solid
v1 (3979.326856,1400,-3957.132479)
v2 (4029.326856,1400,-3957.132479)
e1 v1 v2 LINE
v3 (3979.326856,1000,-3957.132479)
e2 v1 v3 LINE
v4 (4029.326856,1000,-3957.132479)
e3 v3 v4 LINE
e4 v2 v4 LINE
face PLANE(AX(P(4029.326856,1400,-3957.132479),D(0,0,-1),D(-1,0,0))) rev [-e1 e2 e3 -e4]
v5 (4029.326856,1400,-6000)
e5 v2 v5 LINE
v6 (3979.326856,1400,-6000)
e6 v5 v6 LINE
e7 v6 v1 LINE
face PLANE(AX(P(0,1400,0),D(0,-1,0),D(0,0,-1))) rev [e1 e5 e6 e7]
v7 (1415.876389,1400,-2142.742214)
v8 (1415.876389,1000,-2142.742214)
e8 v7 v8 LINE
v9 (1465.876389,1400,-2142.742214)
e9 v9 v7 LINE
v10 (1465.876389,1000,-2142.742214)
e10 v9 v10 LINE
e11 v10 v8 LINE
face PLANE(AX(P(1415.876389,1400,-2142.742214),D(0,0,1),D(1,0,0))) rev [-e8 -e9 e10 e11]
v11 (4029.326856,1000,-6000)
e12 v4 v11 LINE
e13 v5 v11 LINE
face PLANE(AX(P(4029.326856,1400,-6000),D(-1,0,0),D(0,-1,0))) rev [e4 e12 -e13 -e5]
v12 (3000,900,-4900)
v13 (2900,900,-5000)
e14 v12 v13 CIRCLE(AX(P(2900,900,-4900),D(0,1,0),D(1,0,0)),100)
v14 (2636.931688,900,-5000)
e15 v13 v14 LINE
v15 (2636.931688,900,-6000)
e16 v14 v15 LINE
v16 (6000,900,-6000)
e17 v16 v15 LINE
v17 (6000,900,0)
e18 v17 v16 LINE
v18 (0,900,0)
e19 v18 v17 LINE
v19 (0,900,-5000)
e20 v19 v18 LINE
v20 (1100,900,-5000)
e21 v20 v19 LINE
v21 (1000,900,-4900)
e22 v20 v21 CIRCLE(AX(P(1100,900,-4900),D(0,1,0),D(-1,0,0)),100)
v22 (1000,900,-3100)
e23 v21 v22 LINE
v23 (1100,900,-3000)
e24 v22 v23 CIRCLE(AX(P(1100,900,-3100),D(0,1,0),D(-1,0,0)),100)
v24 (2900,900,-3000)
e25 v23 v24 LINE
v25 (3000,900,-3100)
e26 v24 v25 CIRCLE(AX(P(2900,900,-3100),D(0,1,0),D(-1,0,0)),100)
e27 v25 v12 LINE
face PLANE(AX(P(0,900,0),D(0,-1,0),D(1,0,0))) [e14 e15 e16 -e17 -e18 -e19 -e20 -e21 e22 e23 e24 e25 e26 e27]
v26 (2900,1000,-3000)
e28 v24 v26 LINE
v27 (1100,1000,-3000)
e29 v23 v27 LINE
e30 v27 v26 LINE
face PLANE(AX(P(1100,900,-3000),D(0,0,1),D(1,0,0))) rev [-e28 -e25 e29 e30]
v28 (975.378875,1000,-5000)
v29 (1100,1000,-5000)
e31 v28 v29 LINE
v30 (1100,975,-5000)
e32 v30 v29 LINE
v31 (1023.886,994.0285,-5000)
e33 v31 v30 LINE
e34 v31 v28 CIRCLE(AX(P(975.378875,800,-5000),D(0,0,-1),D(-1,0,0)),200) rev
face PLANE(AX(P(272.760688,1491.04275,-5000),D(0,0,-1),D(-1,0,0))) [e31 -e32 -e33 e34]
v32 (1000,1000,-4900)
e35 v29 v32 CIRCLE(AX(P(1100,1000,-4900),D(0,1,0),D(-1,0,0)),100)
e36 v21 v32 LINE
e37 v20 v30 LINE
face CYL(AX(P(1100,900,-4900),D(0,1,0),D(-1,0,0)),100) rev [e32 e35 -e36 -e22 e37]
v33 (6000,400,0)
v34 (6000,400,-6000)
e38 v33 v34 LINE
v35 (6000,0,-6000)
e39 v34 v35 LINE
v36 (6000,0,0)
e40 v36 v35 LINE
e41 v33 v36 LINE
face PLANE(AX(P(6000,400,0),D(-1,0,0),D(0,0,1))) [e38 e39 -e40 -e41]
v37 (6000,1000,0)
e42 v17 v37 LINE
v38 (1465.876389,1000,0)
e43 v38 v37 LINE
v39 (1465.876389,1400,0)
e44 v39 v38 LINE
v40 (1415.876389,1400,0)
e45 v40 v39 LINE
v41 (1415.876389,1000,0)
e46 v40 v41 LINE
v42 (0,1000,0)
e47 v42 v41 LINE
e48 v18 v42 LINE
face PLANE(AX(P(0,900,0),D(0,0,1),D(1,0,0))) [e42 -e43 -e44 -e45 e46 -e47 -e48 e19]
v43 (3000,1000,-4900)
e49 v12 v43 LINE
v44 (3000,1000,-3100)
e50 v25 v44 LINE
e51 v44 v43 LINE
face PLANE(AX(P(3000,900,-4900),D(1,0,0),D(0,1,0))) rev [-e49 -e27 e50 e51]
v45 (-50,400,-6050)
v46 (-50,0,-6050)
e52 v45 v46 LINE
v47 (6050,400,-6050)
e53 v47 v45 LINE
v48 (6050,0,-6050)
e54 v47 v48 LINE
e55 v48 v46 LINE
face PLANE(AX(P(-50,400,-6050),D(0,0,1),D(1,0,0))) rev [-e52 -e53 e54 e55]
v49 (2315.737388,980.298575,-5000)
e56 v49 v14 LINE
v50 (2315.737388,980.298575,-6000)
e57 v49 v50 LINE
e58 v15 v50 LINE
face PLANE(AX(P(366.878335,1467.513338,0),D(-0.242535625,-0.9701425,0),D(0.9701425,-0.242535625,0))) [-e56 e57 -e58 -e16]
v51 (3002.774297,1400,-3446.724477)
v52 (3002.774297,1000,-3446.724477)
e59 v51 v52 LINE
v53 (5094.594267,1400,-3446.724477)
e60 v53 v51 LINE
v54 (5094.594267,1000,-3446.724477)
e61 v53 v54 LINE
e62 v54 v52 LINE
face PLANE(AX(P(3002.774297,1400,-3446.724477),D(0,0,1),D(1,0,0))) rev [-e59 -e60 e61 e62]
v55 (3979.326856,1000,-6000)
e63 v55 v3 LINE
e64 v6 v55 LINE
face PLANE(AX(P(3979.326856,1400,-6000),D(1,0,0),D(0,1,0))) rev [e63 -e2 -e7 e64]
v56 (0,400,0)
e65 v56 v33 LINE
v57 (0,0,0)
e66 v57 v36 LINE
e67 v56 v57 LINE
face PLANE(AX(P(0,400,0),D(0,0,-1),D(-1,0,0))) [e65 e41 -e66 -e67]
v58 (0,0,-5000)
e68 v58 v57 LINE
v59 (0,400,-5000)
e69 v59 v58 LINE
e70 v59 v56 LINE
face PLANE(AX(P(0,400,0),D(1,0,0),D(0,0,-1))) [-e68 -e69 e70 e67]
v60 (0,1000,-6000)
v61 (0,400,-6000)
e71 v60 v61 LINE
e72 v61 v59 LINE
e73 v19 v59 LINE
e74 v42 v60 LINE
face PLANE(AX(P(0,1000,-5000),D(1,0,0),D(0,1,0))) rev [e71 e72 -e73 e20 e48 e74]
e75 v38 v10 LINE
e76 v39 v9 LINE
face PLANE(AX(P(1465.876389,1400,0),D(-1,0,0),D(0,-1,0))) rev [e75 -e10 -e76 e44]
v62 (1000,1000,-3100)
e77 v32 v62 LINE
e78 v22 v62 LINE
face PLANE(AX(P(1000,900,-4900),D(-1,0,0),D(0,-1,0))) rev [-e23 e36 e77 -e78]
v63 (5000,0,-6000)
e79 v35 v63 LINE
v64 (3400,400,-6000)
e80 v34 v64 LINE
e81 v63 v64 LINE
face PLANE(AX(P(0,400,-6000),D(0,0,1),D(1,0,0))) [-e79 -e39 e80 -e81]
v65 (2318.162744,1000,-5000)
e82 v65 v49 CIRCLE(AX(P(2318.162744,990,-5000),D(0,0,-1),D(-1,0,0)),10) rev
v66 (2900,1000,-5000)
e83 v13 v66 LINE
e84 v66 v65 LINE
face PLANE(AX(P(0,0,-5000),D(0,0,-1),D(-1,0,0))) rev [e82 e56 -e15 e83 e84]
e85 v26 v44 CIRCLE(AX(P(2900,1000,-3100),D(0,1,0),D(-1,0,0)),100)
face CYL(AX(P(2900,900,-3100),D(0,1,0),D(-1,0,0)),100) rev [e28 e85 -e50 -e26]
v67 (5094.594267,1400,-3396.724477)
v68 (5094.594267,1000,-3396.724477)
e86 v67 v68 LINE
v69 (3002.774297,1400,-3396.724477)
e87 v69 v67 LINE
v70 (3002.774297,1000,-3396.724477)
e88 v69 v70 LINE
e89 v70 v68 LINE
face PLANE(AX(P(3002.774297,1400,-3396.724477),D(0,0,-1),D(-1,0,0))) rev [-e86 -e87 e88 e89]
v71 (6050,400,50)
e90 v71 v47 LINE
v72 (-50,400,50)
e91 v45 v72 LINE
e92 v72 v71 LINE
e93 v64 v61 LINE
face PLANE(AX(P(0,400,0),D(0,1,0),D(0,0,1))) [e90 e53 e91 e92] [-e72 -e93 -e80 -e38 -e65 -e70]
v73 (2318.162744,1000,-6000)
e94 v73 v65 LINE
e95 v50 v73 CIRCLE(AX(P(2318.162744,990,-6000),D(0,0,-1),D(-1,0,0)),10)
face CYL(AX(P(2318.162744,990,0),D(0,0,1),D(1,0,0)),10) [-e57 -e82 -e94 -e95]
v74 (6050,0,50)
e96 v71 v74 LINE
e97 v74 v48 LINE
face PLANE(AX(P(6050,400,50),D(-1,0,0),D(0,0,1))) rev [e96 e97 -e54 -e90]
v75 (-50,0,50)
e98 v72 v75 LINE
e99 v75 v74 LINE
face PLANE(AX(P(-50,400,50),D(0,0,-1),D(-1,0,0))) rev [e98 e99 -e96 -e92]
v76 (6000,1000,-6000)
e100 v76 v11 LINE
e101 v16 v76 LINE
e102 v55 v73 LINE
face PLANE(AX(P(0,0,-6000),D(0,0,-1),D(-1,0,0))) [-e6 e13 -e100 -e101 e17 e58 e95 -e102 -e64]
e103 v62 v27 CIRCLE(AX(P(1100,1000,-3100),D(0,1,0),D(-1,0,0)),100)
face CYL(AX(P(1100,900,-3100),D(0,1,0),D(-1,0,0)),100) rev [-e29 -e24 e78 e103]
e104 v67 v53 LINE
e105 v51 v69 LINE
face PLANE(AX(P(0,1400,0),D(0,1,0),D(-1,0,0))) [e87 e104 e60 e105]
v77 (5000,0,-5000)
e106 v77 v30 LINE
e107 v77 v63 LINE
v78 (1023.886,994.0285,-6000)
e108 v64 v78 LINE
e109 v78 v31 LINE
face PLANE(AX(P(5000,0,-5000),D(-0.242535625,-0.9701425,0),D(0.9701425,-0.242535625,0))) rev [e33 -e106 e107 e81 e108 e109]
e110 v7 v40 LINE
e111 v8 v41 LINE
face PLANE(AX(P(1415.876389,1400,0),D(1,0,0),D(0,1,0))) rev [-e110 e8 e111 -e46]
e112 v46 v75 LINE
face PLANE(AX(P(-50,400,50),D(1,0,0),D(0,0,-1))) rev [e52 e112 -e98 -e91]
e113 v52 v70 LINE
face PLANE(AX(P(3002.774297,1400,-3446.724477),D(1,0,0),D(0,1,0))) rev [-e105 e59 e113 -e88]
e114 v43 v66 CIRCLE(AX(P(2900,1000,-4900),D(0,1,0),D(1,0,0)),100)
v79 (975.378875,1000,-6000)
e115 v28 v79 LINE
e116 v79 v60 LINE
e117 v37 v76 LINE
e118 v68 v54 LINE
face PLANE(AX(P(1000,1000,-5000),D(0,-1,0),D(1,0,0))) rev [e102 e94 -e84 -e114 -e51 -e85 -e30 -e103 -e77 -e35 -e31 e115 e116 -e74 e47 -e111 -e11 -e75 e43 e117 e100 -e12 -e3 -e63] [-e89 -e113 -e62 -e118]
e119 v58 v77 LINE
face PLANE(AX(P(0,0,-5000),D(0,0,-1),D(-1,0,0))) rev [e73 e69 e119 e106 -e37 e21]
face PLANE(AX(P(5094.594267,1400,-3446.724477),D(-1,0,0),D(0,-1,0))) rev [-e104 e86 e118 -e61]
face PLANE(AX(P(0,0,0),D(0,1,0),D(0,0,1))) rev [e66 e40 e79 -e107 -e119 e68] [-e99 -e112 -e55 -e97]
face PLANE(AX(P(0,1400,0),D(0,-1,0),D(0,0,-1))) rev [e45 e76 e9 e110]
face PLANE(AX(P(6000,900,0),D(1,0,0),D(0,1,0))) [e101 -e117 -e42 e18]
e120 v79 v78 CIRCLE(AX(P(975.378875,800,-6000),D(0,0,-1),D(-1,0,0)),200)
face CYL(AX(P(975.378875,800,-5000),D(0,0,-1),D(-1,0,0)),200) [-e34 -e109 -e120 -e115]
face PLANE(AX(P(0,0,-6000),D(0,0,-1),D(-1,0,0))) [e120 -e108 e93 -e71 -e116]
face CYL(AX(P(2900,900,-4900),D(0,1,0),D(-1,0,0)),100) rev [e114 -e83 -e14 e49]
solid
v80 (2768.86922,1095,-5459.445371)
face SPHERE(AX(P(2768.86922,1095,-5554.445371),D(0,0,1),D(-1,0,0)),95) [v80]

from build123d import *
from build123d.topology import SkipClean

# Parameters (mm, degrees)
SKETCH_1_W          = 6100
SKETCH_1_H          = 6100
SKETCH_1_W_2        = 6000
SKETCH_1_H_2        = 6000
EXTRUDE_1_DEPTH     = 400
EXTRUDE_2_DEPTH     = 1000
SKETCH_6_W          = 6000
SKETCH_6_H          = 6000
EXTRUDE_3_DEPTH     = 100
CUT_EXTRUDE_1_DEPTH = 300
FILLET_1_R          = 10
FILLET_2_R          = 200
SKETCH_10_W         = 50
SKETCH_10_H         = 2142.742214085
SKETCH_10_W_2       = 2091.819969514
SKETCH_10_H_2       = 50
SKETCH_10_H_3       = 2042.86752058
EXTRUDE_4_DEPTH     = 400


with BuildPart() as part:
    # 草图1 → 凸台-拉伸1 (new body)
    with BuildSketch(Plane(origin=(0, 0, 0), x_dir=(1, 0, 0), z_dir=(0, 1, 0))):
        with Locations((3000, 3000)):
            Rectangle(SKETCH_1_W, SKETCH_1_H)
        with Locations((3000, 3000)):
            Rectangle(SKETCH_1_W_2, SKETCH_1_H_2, mode=Mode.SUBTRACT)
    extrude(amount=EXTRUDE_1_DEPTH)

    # 草图5 → 凸台-拉伸2 (add)
    with BuildSketch(Plane.XY.offset(-6000)):
        Polygon((5000, 0), (1000, 1000), (0, 1000), (0, 0), align=None)
    extrude(amount=EXTRUDE_2_DEPTH)

    # 草图6 → 凸台-拉伸3 (add)
    with BuildSketch(Plane(origin=(0, 1000, 0), x_dir=(1, 0, 0), z_dir=(0, 1, 0))):
        with Locations((3000, 3000)):
            Rectangle(SKETCH_6_W, SKETCH_6_H)
        with BuildLine():
            Line((1100, 5000), (2900, 5000))
            ThreePointArc((2900, 5000), (2970.710678119, 4970.710678119), (3000, 4900))
            Line((3000, 4900), (3000, 3100))
            ThreePointArc((3000, 3100), (2970.710678119, 3029.289321881), (2900, 3000))
            Line((2900, 3000), (1100, 3000))
            ThreePointArc((1100, 3000), (1029.289321881, 3029.289321881), (1000, 3100))
            Line((1000, 3100), (1000, 4900))
            ThreePointArc((1000, 4900), (1029.289321881, 4970.710678119), (1100, 5000))
        make_face(mode=Mode.SUBTRACT)
    extrude(amount=-EXTRUDE_3_DEPTH)

    # 草图9 → 切除-拉伸1 (cut)
    with BuildSketch(Plane(origin=(294.117647059, 1176.470588235, 0), x_dir=(0.9701425001453319, -0.24253562503633308, 0), z_dir=(0.24253562503633308, 0.9701425001453319, 0))):
        Polygon((-97.014250015, 5000), (-97.014250015, 6000), (3201.47025048, 6000), (4850.712500727, 6000), (4850.712500727, 5000), align=None)
    extrude(amount=CUT_EXTRUDE_1_DEPTH, mode=Mode.SUBTRACT)

    # 圆角1
    fillet_1_edges = [part.edges().sort_by_distance(p)[0] for p in [
        (2236.931687685, 1000, -5500),
    ]]
    fillet(fillet_1_edges, radius=FILLET_1_R)

    # 圆角2
    fillet_2_edges = [part.edges().sort_by_distance(p)[0] for p in [
        (1000, 1000, -5500),
    ]]
    fillet(fillet_2_edges, radius=FILLET_2_R)

    # 草图10 → 凸台-拉伸4 (add)
    with BuildSketch(Plane(origin=(0, 1000, 0), x_dir=(1, 0, 0), z_dir=(0, 1, 0))):
        with Locations((1440.876389135, 1071.371107043)):
            Rectangle(SKETCH_10_W, SKETCH_10_H)
        with Locations((4048.684281799, 3421.724476977)):
            Rectangle(SKETCH_10_W_2, SKETCH_10_H_2)
        with Locations((4004.326855754, 4978.56623971)):
            Rectangle(SKETCH_10_W, SKETCH_10_H_3)
    extrude(amount=EXTRUDE_4_DEPTH)


with BuildPart() as body_2:
    # 草图12 → 旋转2 (revolve)
    with SkipClean():  # the faces are left unmerged after this step: merging them gives an invalid solid
        with BuildSketch(Plane(origin=(0, 1095, 0), x_dir=(1, 0, 0), z_dir=(0, 1, 0)), mode=Mode.PRIVATE) as revolve_2_sk:
            with BuildLine():
                ThreePointArc((2768.869220223, 5649.445371303), (2673.869220223, 5554.445371303), (2768.869220223, 5459.445371303))
                Line((2768.869220223, 5459.445371303), (2768.869220223, 5649.445371303))
            make_face()
            with BuildLine():
                Line((2768.869220223, 5649.445371303), (2768.869220223, 5459.445371303))
                ThreePointArc((2768.869220223, 5459.445371303), (2836.044364436, 5487.270227091), (2863.869220223, 5554.445371303))
                ThreePointArc((2863.869220223, 5554.445371303), (2836.044364436, 5621.620515516), (2768.869220223, 5649.445371303))
            make_face()
        revolve(revolve_2_sk.sketch.rotate(Axis((2768.869220223, 1095, -4554.445371303), (0, 0, -1)), 180), axis=Axis((2768.869220223, 1095, -4554.445371303), (0, 0, -1)))
    add(body_2.part.scale(1), mode=Mode.REPLACE)  # the faces are merged on a copy


solid = Compound([part.part, body_2.part])
